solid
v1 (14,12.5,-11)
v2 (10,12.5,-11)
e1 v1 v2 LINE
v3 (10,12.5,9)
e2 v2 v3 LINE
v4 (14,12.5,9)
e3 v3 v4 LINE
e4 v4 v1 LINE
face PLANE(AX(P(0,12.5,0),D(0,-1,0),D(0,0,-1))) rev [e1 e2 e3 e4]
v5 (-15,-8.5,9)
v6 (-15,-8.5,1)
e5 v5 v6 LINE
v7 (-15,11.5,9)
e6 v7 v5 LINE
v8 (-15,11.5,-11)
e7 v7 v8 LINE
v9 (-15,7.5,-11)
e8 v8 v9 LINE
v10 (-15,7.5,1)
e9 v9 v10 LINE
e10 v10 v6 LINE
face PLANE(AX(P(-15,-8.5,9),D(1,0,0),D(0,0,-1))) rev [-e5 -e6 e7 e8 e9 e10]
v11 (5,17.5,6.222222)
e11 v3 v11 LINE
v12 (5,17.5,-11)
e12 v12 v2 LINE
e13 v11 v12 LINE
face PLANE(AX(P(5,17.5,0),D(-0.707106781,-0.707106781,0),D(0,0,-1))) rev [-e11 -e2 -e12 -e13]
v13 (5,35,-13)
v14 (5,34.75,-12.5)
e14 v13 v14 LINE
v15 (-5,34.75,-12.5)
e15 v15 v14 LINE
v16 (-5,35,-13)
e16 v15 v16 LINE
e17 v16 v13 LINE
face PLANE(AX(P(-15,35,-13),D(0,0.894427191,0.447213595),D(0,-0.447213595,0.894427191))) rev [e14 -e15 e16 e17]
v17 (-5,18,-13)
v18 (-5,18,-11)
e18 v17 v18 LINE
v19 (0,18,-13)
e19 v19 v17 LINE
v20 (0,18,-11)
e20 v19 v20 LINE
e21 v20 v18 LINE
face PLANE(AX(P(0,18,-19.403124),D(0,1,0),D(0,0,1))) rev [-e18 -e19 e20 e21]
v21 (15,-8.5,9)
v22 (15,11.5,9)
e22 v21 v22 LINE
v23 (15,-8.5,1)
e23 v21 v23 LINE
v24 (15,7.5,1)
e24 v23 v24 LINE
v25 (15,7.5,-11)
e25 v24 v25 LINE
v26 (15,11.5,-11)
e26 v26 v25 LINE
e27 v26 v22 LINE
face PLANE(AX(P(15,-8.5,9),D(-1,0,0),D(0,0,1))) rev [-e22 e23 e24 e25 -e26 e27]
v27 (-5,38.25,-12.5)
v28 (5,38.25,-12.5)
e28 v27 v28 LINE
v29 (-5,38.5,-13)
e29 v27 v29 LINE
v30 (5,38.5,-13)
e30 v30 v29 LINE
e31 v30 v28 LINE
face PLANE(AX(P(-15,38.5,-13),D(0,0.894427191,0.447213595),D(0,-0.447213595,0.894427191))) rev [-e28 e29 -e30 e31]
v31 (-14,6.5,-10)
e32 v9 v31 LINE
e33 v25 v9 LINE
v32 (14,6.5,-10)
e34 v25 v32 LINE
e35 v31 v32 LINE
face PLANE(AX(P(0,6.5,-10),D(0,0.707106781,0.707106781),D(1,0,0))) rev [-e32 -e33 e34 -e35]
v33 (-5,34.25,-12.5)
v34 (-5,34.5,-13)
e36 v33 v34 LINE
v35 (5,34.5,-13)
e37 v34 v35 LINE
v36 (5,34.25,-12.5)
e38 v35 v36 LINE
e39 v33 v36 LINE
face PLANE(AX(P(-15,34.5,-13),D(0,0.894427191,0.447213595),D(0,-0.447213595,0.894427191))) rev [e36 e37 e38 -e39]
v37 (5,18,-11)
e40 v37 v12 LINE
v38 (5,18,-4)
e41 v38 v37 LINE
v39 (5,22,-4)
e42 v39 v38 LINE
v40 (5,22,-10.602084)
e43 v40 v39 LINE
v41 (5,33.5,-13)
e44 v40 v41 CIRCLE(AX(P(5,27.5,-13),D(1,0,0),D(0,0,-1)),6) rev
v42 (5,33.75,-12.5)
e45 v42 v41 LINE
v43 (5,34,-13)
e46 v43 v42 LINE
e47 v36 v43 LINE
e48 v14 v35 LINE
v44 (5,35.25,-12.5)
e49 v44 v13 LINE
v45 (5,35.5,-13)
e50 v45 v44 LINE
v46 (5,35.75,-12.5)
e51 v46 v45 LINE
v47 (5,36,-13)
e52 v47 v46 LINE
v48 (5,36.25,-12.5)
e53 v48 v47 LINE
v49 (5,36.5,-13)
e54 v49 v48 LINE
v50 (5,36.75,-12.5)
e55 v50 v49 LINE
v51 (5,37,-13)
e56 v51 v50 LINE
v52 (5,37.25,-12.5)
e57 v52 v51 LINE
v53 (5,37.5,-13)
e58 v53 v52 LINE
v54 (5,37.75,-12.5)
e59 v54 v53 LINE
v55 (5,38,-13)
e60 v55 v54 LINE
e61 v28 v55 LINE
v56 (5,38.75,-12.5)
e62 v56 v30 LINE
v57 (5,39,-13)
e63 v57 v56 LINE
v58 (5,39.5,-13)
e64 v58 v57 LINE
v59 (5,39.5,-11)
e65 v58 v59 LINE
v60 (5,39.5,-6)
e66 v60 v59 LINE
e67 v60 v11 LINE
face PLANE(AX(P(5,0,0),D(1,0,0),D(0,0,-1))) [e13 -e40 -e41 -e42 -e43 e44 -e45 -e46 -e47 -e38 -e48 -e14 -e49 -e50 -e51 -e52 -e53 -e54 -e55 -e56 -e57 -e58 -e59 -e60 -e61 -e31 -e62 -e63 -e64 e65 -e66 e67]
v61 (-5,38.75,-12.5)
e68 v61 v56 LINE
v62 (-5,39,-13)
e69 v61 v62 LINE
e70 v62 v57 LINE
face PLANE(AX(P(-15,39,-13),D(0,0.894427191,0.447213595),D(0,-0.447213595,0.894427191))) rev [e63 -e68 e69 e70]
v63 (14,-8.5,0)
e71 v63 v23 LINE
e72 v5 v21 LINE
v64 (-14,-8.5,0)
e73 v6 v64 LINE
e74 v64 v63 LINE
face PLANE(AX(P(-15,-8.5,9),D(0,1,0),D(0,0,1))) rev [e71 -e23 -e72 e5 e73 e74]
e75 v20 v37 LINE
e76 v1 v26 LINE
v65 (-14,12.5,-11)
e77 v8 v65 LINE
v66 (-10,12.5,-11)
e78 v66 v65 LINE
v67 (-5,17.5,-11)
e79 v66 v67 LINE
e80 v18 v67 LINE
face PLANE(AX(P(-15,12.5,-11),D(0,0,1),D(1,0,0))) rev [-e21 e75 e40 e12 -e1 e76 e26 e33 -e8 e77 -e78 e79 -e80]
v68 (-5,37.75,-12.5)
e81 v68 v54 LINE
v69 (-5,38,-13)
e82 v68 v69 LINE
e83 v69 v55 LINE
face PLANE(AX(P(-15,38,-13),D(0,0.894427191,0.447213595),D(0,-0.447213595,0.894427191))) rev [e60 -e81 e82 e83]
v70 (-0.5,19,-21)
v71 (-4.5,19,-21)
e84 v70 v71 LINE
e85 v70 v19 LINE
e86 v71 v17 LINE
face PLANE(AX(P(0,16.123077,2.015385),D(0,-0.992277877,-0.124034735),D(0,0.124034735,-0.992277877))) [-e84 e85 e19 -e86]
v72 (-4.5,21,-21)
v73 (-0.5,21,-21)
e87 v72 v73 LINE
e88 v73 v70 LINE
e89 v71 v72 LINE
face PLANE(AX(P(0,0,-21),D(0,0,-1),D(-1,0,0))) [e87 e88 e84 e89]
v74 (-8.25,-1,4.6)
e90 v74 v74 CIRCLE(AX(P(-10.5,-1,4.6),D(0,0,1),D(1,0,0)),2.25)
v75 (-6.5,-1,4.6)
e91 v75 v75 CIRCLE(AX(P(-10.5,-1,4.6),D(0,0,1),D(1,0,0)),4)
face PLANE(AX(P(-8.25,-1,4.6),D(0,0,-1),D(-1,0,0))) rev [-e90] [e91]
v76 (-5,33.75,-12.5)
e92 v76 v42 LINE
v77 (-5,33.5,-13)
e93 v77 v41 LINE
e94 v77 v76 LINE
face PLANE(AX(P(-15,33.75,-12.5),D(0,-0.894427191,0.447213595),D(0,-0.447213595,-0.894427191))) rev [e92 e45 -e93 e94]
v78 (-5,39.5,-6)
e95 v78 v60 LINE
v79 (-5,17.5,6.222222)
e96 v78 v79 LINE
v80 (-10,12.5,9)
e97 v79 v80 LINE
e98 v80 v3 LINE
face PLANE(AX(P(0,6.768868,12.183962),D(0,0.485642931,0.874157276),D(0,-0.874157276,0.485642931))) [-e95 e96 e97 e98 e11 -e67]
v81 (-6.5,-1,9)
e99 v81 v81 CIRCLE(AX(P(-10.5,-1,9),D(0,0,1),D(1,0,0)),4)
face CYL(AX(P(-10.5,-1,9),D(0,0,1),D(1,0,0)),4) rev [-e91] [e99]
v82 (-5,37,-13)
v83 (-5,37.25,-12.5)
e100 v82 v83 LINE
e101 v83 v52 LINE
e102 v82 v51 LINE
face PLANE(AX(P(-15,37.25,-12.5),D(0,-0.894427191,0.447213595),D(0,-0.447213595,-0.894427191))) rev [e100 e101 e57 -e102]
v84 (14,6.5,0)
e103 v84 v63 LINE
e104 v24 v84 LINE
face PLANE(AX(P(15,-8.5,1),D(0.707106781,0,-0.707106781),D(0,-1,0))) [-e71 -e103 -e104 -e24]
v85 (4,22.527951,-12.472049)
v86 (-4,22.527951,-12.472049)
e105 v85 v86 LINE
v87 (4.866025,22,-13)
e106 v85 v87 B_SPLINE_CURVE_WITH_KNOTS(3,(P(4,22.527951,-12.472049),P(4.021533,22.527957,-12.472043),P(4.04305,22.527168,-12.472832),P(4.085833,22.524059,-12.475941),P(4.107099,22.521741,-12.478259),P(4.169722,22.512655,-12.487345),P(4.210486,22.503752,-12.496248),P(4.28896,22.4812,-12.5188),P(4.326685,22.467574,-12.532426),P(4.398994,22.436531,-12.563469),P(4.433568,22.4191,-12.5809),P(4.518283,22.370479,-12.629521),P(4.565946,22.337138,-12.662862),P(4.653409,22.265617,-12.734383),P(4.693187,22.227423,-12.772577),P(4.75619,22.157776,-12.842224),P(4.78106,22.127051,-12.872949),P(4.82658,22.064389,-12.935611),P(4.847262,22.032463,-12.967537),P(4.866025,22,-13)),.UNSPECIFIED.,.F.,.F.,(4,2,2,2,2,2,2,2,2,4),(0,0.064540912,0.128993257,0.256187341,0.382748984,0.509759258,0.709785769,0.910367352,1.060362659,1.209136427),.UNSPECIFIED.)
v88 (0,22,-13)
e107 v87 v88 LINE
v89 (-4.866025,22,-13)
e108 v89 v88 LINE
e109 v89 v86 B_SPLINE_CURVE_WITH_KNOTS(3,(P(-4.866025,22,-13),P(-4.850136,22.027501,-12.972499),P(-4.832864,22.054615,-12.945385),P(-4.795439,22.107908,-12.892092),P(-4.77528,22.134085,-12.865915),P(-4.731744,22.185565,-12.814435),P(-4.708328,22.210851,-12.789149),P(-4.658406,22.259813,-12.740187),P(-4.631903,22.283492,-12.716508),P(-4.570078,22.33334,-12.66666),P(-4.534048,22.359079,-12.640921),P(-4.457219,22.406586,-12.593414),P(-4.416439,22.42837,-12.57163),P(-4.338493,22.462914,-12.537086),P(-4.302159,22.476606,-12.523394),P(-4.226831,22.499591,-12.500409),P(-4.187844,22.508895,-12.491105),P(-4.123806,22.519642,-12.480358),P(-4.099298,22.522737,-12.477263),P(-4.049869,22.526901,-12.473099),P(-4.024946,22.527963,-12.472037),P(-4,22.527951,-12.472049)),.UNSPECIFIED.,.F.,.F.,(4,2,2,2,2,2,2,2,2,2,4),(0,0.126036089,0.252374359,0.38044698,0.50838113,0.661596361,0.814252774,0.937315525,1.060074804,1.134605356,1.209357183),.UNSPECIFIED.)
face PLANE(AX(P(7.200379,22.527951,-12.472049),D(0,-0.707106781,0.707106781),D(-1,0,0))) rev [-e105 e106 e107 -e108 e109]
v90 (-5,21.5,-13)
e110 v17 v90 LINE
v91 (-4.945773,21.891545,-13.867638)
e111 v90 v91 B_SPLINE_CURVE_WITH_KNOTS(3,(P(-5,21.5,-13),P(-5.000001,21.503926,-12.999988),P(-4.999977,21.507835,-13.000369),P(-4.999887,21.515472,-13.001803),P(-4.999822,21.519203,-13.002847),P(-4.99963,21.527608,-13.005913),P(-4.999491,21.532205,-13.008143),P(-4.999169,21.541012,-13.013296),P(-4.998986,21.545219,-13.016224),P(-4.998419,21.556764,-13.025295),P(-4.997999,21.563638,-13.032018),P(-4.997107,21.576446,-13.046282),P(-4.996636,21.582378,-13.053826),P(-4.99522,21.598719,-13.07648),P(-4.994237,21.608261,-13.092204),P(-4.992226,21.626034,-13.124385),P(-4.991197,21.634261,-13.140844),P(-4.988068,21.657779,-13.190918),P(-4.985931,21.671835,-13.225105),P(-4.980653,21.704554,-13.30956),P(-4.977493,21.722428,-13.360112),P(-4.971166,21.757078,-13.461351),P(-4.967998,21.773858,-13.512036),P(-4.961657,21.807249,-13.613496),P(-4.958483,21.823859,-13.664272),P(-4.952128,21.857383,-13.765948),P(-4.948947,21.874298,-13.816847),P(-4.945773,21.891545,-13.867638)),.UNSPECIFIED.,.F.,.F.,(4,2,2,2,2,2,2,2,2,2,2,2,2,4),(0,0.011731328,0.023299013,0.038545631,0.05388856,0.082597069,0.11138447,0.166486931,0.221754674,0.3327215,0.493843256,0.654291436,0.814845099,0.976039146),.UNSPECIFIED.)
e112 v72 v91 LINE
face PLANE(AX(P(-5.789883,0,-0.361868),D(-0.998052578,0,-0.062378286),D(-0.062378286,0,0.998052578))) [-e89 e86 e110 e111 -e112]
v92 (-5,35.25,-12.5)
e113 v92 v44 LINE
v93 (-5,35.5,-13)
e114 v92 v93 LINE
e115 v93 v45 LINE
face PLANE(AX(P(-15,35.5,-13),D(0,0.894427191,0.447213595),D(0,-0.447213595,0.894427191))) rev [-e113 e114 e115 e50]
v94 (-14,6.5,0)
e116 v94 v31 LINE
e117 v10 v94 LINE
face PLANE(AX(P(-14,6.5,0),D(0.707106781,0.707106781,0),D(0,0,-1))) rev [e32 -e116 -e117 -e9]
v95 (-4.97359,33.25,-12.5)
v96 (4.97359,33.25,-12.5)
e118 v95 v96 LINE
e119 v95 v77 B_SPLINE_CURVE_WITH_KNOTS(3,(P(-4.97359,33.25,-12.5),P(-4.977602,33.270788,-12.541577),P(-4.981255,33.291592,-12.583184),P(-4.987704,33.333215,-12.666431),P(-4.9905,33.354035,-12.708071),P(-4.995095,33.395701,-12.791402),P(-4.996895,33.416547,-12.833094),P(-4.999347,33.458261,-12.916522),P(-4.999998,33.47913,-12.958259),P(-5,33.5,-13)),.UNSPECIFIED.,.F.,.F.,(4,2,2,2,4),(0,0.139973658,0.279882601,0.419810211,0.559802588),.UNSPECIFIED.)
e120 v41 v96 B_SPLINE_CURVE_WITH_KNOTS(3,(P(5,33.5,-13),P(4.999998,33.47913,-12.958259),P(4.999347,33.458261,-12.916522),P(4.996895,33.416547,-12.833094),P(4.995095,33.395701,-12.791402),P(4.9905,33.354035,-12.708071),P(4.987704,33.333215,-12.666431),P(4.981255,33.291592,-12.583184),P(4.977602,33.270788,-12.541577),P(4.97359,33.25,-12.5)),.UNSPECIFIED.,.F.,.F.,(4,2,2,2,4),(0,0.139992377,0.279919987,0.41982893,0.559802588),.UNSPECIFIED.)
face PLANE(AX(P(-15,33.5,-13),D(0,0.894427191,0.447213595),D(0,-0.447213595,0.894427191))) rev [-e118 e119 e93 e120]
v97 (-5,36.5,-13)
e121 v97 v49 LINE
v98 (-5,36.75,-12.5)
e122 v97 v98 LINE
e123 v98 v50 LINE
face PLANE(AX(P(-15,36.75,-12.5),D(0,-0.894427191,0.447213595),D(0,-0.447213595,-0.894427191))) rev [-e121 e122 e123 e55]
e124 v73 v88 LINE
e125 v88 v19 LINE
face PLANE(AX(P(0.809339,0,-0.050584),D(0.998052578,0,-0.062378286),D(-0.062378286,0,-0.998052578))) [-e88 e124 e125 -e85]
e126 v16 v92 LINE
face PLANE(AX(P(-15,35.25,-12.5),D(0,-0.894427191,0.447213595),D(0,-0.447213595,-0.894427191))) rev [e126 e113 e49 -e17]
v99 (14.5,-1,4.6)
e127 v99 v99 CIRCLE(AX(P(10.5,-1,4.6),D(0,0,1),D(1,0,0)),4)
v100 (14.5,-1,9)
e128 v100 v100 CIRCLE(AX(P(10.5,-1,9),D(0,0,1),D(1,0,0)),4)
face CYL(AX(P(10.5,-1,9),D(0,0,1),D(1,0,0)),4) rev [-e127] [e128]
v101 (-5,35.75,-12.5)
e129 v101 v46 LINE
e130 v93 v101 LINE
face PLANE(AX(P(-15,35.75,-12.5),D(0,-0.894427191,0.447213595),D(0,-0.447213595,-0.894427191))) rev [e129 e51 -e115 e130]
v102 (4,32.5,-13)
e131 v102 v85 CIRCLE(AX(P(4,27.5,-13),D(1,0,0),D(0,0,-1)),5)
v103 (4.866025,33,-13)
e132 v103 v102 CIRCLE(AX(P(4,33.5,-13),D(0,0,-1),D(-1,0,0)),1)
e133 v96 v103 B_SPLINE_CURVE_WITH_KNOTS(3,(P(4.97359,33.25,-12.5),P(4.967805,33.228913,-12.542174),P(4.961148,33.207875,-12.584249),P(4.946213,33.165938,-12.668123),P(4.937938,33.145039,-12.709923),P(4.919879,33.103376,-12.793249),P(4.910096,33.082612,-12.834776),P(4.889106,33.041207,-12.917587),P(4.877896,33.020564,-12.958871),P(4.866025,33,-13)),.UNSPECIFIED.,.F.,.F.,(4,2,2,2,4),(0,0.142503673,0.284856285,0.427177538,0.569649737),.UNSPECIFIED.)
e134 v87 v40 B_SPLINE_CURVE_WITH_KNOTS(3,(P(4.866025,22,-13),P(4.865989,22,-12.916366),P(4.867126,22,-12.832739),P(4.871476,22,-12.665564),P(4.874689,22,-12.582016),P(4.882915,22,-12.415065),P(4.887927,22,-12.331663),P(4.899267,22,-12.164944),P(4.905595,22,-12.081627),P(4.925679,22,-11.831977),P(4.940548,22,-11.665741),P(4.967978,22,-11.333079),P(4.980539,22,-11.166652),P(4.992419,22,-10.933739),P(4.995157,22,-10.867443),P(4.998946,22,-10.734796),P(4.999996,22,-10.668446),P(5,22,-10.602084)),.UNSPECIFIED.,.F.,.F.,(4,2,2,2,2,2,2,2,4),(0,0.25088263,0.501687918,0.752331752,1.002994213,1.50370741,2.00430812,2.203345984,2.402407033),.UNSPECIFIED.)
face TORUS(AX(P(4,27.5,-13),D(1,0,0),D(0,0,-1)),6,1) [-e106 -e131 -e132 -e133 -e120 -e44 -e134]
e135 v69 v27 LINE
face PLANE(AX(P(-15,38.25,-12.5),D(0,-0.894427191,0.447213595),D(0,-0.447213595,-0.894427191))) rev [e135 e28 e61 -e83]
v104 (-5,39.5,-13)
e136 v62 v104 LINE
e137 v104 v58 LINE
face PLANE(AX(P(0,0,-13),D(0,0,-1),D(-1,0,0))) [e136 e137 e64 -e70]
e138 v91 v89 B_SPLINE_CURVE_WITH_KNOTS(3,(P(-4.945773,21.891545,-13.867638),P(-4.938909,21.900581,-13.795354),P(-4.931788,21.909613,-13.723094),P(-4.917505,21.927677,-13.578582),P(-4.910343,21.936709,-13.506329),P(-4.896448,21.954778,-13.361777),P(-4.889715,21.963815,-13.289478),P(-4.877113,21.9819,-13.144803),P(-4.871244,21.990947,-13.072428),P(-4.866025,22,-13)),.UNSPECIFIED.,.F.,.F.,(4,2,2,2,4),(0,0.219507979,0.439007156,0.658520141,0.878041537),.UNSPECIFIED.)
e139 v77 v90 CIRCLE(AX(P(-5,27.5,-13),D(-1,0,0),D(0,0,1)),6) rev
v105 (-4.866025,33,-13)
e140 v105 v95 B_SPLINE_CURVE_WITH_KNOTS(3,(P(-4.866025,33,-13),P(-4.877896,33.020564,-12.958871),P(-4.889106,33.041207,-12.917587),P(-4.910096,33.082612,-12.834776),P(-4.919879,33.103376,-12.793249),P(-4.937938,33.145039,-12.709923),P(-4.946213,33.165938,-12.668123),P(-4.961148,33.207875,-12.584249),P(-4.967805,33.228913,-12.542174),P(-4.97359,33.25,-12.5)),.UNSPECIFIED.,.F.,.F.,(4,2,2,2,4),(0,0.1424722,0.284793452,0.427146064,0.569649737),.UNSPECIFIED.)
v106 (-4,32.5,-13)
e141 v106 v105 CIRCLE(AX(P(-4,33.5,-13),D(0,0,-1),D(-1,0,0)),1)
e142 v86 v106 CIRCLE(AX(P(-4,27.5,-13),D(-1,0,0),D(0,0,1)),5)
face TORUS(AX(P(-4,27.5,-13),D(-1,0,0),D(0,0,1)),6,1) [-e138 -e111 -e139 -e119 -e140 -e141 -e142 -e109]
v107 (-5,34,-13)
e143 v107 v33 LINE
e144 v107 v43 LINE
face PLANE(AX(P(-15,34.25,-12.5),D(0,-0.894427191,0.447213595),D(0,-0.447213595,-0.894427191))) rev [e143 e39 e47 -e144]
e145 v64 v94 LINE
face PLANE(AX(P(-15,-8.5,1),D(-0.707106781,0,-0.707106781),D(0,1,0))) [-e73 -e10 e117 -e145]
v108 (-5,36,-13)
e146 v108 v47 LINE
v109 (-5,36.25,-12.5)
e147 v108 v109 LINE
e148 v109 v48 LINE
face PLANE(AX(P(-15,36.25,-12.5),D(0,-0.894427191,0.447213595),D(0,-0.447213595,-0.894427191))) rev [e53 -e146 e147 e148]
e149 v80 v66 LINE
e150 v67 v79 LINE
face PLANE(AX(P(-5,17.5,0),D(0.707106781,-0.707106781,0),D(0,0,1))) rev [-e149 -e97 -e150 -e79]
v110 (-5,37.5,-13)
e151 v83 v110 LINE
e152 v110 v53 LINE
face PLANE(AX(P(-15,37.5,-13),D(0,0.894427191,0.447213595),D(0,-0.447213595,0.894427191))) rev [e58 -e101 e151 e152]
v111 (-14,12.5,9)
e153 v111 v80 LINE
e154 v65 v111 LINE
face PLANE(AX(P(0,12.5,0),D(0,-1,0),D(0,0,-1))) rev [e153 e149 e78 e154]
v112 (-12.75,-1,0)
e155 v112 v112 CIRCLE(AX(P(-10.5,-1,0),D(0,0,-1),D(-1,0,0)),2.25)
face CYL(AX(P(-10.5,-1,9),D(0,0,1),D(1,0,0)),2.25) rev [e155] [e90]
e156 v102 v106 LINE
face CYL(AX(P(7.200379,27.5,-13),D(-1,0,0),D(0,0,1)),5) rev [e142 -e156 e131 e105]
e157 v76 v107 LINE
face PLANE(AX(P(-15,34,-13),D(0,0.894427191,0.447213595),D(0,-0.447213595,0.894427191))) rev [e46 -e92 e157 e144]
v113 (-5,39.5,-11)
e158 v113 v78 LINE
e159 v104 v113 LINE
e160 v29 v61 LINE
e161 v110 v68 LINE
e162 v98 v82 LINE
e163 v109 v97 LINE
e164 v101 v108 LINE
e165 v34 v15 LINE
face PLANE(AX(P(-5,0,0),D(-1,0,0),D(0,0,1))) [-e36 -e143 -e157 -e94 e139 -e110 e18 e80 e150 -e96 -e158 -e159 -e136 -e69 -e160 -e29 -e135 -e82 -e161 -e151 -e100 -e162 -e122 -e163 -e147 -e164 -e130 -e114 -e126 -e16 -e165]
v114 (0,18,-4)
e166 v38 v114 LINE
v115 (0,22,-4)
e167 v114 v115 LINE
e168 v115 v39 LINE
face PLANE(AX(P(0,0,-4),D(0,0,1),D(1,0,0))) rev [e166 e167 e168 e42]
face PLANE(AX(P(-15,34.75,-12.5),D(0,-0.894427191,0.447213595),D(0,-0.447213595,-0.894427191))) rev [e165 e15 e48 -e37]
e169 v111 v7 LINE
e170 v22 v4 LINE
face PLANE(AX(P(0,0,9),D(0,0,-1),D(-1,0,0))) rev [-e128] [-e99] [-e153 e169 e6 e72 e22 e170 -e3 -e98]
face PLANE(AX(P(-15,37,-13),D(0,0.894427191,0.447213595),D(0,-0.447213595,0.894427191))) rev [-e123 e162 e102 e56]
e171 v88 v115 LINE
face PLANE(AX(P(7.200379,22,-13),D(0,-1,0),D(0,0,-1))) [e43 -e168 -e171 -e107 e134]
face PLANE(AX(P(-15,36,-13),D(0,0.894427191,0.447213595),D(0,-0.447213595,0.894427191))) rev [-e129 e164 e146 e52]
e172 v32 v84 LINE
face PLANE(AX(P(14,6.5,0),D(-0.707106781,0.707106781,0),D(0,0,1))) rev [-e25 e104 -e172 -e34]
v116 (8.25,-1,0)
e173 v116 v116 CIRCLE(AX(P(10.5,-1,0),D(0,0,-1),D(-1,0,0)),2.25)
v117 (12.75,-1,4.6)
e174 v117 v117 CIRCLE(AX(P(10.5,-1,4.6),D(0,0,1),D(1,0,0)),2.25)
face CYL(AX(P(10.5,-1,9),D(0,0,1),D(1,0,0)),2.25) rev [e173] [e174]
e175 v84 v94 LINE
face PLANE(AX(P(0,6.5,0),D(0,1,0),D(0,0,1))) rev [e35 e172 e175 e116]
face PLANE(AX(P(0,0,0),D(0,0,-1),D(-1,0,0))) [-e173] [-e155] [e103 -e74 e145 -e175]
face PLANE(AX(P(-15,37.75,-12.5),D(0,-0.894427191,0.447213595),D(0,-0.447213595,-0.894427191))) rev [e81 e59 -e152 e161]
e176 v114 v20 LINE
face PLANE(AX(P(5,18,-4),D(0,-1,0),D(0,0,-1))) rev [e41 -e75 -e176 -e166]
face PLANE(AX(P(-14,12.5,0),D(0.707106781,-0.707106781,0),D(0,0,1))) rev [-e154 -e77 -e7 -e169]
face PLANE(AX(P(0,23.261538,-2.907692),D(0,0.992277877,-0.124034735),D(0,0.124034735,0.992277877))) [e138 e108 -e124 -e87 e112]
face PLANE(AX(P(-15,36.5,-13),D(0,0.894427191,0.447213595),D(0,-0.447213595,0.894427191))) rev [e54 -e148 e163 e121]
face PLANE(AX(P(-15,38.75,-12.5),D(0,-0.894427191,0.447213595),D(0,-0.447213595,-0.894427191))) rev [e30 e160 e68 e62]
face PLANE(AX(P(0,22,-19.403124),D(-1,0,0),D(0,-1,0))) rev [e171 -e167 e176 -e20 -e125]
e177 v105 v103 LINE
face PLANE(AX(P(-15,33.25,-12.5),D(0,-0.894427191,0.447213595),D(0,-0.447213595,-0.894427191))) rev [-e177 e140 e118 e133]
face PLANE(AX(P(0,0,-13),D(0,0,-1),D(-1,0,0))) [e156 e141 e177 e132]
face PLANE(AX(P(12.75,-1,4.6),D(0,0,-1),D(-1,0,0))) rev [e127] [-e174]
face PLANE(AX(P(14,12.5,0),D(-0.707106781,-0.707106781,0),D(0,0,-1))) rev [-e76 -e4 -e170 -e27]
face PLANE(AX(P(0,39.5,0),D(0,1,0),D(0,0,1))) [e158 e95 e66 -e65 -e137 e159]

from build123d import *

# Parameters (mm, degrees)
AUFSATZ_LINEAR_AUSTRAGEN1_OUTLINE_W                  = 30
AUFSATZ_LINEAR_AUSTRAGEN1_OUTLINE_H                  = 17
AUFSATZ_LINEAR_AUSTRAGEN1_DEPTH                      = 9
SKIZZE3_W                                            = 30
SKIZZE3_H                                            = 20
AUFSATZ_LINEAR_AUSTRAGEN2_DEPTH                      = 4
FASE1_SIZE                                           = 5
SKIZZE7_W                                            = 10
SKIZZE7_H                                            = 7
AUFSATZ_LINEAR_AUSTRAGEN3_DEPTH                      = 2
SCHNITT_LINEAR_AUSTRAGEN1_DEPTH                      = 45.206900067
LINEARES_MUSTER1_COUNT                               = 12
LINEARES_MUSTER1_PITCH                               = 0.5
AUFSATZ_LINEAR_START                                 = -5
AUFSATZ_LINEAR_AUSTRAGEN4_DEPTH                      = 10
SCHNITT_LINEAR_AUSTRAGEN2_DEPTH                      = 45.206900067
SCHNITT_LINEAR_AUSTRAGEN2_DEPTH_BACK                 = 45.206900067
SKIZZE10_W                                           = 5
SKIZZE10_H                                           = 4
AUFSATZ_LINEAR_AUSTRAGEN5_DEPTH                      = 2
SKIZZE13_W                                           = 5
SKIZZE13_H                                           = 4
SCHNITT_LINEAR_AUSTRAGEN3_DEPTH                      = 9
FASE2_SIZE                                           = 0.5
VERRUNDUNG1_R                                        = 1
STIRNSENKUNG_F_R_M4_ZYLINDERSCHRAUBE_MIT_D           = 4.5
STIRNSENKUNG_F_R_M4_ZYLINDERSCHRAUBE_MIT_CBORE_D     = 8
STIRNSENKUNG_F_R_M4_ZYLINDERSCHRAUBE_MIT_CBORE_DEPTH = 4.4
SKIZZE18_W                                           = 30
SKIZZE18_H                                           = 11
AUFSATZ_LINEAR_AUSTRAGEN6_DEPTH                      = 2
FASE3_SIZE                                           = 1


with BuildPart() as part:
    # Aufsatz-Linear austragen1: read off the stored shape, not the designer's step
    # Aufsatz-Linear austragen1 outline → Aufsatz-Linear austragen1 (new body)
    with BuildSketch(Plane.XY):
        Rectangle(AUFSATZ_LINEAR_AUSTRAGEN1_OUTLINE_W, AUFSATZ_LINEAR_AUSTRAGEN1_OUTLINE_H)
    extrude(amount=AUFSATZ_LINEAR_AUSTRAGEN1_DEPTH)

    # Skizze3 → Aufsatz-Linear austragen2 (add)
    with BuildSketch(Plane(origin=(0, 8.5, 0), x_dir=(1, 0, 0), z_dir=(0, 1, 0))):
        with Locations((0, 1)):
            Rectangle(SKIZZE3_W, SKIZZE3_H)
    extrude(amount=AUFSATZ_LINEAR_AUSTRAGEN2_DEPTH)

    # Skizze4 → Ausformung1 section 0
    with BuildSketch(Plane(origin=(0, 39.5, 0), x_dir=(1, 0, 0), z_dir=(0, 1, 0))):
        with BuildLine():
            Line((-5, 11), (5, 11))
            Line((5, 11), (5, 6))
            Line((5, 6), (-5, 6))
            Line((-5, 6), (-5, 11))
        make_face()
    # Skizze5 → Ausformung1 section 1
    with BuildSketch(Plane(origin=(0, 12.5, 0), x_dir=(1, 0, 0), z_dir=(0, 1, 0))):
        with BuildLine():
            Line((-5, 11), (5, 11))
            Line((5, 11), (5, -9))
            Line((5, -9), (-5, -9))
            Line((-5, -9), (-5, 11))
        make_face()
    loft()

    # Fase1
    fase1_edges = [part.edges().sort_by_distance(p)[0] for p in [
        (5, 12.5, -1),
        (-5, 12.5, -1),
    ]]
    chamfer(fase1_edges, length=FASE1_SIZE)

    # Skizze7 → Aufsatz-Linear austragen3 (add)
    with BuildSketch(Plane(origin=(0, 0, -11), x_dir=(-1, 0, 0), z_dir=(0, 0, -1))):
        with Locations((0, 36)):
            Rectangle(SKIZZE7_W, SKIZZE7_H)
    extrude(amount=AUFSATZ_LINEAR_AUSTRAGEN3_DEPTH)

    # Skizze6 → Schnitt-Linear austragen1 (cut, symmetric)
    with BuildSketch(Plane(origin=(0, 0, 0), x_dir=(0, 0, -1), z_dir=(1, 0, 0))):
        Polygon((13, 39), (12.5, 38.75), (13, 38.5), align=None)
    schnitt_linear_austragen1 = extrude(amount=SCHNITT_LINEAR_AUSTRAGEN1_DEPTH, both=True, mode=Mode.SUBTRACT)

    # Lineares Muster1: Schnitt-Linear austragen1 ×12
    with Locations(*[(0, -i * LINEARES_MUSTER1_PITCH, 0) for i in range(1, LINEARES_MUSTER1_COUNT)]):
        add(schnitt_linear_austragen1, mode=Mode.SUBTRACT)

    # Skizze8 → Aufsatz-Linear austragen4 (add)
    with BuildSketch(Plane(origin=(0, 0, 0), x_dir=(0, 0, -1), z_dir=(1, 0, 0)).offset(AUFSATZ_LINEAR_START)):
        with BuildLine():
            ThreePointArc((11, 32.082575695), (11.978451782, 32.394531565), (13, 32.5))
            Line((13, 32.5), (11, 32.5))
            Line((11, 32.5), (11, 32.082575695))
        make_face()
        with BuildLine():
            Line((11, 22.917424305), (11, 22))
            Line((11, 22), (13, 22))
            Line((13, 22), (13, 22.5))
            ThreePointArc((13, 22.5), (11.978451782, 22.605468435), (11, 22.917424305))
        make_face()
    extrude(amount=AUFSATZ_LINEAR_AUSTRAGEN4_DEPTH)

    # Skizze9 → Schnitt-Linear austragen2 (cut, two sides: drawn at the far end of the back side and taken through both)
    with BuildSketch(Plane(origin=(0, 0, 0), x_dir=(0, 0, -1), z_dir=(1, 0, 0)).offset(-SCHNITT_LINEAR_AUSTRAGEN2_DEPTH_BACK)):
        with BuildLine():
            Line((11, 32.082575695), (11, 22.917424305))
            ThreePointArc((11, 22.917424305), (8, 27.5), (11, 32.082575695))
        make_face()
    extrude(amount=SCHNITT_LINEAR_AUSTRAGEN2_DEPTH + SCHNITT_LINEAR_AUSTRAGEN2_DEPTH_BACK, mode=Mode.SUBTRACT)

    # Skizze10 → Aufsatz-Linear austragen5 (add)
    with BuildSketch(Plane(origin=(0, 0, -11), x_dir=(-1, 0, 0), z_dir=(0, 0, -1))):
        with Locations((2.5, 20)):
            Rectangle(SKIZZE10_W, SKIZZE10_H)
    extrude(amount=AUFSATZ_LINEAR_AUSTRAGEN5_DEPTH)

    # Skizze12 → Ausformung2 section 0
    with BuildSketch(Plane(origin=(0, 0, -21), x_dir=(-1, 0, 0), z_dir=(0, 0, -1))):
        with BuildLine():
            Line((0.5, 21), (4.5, 21))
            Line((4.5, 21), (4.5, 19))
            Line((4.5, 19), (0.5, 19))
            Line((0.5, 19), (0.5, 21))
        make_face()
    # Skizze11 → Ausformung2 section 1
    with BuildSketch(Plane(origin=(0, 0, -13), x_dir=(-1, 0, 0), z_dir=(0, 0, -1))):
        with BuildLine():
            Line((0, 18), (5, 18))
            Line((5, 18), (5, 22))
            Line((5, 22), (0, 22))
            Line((0, 22), (0, 18))
        make_face()
    loft()

    # Skizze13 → Schnitt-Linear austragen3 (cut)
    with BuildSketch(Plane(origin=(0, 0, -13), x_dir=(-1, 0, 0), z_dir=(0, 0, -1))):
        with Locations((-2.5, 20)):
            Rectangle(SKIZZE13_W, SKIZZE13_H)
    extrude(amount=-SCHNITT_LINEAR_AUSTRAGEN3_DEPTH, mode=Mode.SUBTRACT)

    # Fase2
    # the kernel refuses this chamfer: 0.5 mm, written as the material it takes off along each edge
    with BuildSketch(Plane(origin=(-6.359313388, 22.5, -13), x_dir=(0, 0.05286907949936605, 0.9986014522485384), z_dir=(1, 0, 0))) as fase2_piece_1:
        with BuildLine():
            Line((0.528690795, 0), (-FASE2_SIZE * 0.0528690794994, FASE2_SIZE * 0.998601452249))
            Line((-FASE2_SIZE * 0.0528690794994, FASE2_SIZE * 0.998601452249), (0, 0))
            ThreePointArc((0, 0), (0.271800807, 0.00698718), (0.528690795, 0))
        make_face()
    extrude(amount=12.718626777, mode=Mode.SUBTRACT)

    # Verrundung1
    # the kernel refuses this fillet: 1 mm, written as the material it takes off along each edge
    with BuildSketch(Plane(origin=(5, 27.5, -13), x_dir=(0, -0.9230106794344456, -0.38477433080958384), z_dir=(0, 0.38477433080958384, -0.9230106794344456))) as verrundung1_piece_1:
        with BuildLine():
            CenterArc((5 + VERRUNDUNG1_R, VERRUNDUNG1_R), VERRUNDUNG1_R, 180, 90)
            Line((5, VERRUNDUNG1_R), (5, 0))
            Line((5, 0), (5 + VERRUNDUNG1_R, 0))
        make_face()
    revolve(axis=Axis((5, 27.5, -13), (-1, 0, 0)), revolution_arc=231.320638443, mode=Mode.SUBTRACT)
    with BuildSketch(Plane(origin=(-5, 27.5, -13), x_dir=(0, 0.8772223630986392, -0.4800842901820881), z_dir=(0, -0.4800842901820881, -0.8772223630986392))) as verrundung1_piece_2:
        with BuildLine():
            CenterArc((5 + VERRUNDUNG1_R, VERRUNDUNG1_R), VERRUNDUNG1_R, 180, 90)
            Line((5, VERRUNDUNG1_R), (5, 0))
            Line((5, 0), (5 + VERRUNDUNG1_R, 0))
        make_face()
    revolve(axis=Axis((-5, 27.5, -13), (1, 0, 0)), revolution_arc=231.320638443, mode=Mode.SUBTRACT)

    # Stirnsenkung für M4 Zylinderschraube mit Innensechskant1 (through all)
    with Locations(Plane.XY.offset(9)):
        with Locations((-10.5, -1), (10.5, -1)):
            CounterBoreHole(STIRNSENKUNG_F_R_M4_ZYLINDERSCHRAUBE_MIT_D / 2, STIRNSENKUNG_F_R_M4_ZYLINDERSCHRAUBE_MIT_CBORE_D / 2, STIRNSENKUNG_F_R_M4_ZYLINDERSCHRAUBE_MIT_CBORE_DEPTH)

    # Skizze18 → Aufsatz-Linear austragen6 (add)
    with BuildSketch(Plane.XZ.offset(-8.5)):
        with Locations((0, -5.5)):
            Rectangle(SKIZZE18_W, SKIZZE18_H)
    extrude(amount=AUFSATZ_LINEAR_AUSTRAGEN6_DEPTH)

    # Fase3
    fase3_edges = [part.edges().sort_by_distance(p)[0] for p in [
        (-15, -1, 0),
        (15, -1, 0),
        (15, 6.5, -5.5),
        (-15, 6.5, -5.5),
        (0, 6.5, -11),
        (15, 12.5, -1),
        (-15, 12.5, -1),
    ]]
    chamfer(fase3_edges, length=FASE3_SIZE)


solid = part.part
